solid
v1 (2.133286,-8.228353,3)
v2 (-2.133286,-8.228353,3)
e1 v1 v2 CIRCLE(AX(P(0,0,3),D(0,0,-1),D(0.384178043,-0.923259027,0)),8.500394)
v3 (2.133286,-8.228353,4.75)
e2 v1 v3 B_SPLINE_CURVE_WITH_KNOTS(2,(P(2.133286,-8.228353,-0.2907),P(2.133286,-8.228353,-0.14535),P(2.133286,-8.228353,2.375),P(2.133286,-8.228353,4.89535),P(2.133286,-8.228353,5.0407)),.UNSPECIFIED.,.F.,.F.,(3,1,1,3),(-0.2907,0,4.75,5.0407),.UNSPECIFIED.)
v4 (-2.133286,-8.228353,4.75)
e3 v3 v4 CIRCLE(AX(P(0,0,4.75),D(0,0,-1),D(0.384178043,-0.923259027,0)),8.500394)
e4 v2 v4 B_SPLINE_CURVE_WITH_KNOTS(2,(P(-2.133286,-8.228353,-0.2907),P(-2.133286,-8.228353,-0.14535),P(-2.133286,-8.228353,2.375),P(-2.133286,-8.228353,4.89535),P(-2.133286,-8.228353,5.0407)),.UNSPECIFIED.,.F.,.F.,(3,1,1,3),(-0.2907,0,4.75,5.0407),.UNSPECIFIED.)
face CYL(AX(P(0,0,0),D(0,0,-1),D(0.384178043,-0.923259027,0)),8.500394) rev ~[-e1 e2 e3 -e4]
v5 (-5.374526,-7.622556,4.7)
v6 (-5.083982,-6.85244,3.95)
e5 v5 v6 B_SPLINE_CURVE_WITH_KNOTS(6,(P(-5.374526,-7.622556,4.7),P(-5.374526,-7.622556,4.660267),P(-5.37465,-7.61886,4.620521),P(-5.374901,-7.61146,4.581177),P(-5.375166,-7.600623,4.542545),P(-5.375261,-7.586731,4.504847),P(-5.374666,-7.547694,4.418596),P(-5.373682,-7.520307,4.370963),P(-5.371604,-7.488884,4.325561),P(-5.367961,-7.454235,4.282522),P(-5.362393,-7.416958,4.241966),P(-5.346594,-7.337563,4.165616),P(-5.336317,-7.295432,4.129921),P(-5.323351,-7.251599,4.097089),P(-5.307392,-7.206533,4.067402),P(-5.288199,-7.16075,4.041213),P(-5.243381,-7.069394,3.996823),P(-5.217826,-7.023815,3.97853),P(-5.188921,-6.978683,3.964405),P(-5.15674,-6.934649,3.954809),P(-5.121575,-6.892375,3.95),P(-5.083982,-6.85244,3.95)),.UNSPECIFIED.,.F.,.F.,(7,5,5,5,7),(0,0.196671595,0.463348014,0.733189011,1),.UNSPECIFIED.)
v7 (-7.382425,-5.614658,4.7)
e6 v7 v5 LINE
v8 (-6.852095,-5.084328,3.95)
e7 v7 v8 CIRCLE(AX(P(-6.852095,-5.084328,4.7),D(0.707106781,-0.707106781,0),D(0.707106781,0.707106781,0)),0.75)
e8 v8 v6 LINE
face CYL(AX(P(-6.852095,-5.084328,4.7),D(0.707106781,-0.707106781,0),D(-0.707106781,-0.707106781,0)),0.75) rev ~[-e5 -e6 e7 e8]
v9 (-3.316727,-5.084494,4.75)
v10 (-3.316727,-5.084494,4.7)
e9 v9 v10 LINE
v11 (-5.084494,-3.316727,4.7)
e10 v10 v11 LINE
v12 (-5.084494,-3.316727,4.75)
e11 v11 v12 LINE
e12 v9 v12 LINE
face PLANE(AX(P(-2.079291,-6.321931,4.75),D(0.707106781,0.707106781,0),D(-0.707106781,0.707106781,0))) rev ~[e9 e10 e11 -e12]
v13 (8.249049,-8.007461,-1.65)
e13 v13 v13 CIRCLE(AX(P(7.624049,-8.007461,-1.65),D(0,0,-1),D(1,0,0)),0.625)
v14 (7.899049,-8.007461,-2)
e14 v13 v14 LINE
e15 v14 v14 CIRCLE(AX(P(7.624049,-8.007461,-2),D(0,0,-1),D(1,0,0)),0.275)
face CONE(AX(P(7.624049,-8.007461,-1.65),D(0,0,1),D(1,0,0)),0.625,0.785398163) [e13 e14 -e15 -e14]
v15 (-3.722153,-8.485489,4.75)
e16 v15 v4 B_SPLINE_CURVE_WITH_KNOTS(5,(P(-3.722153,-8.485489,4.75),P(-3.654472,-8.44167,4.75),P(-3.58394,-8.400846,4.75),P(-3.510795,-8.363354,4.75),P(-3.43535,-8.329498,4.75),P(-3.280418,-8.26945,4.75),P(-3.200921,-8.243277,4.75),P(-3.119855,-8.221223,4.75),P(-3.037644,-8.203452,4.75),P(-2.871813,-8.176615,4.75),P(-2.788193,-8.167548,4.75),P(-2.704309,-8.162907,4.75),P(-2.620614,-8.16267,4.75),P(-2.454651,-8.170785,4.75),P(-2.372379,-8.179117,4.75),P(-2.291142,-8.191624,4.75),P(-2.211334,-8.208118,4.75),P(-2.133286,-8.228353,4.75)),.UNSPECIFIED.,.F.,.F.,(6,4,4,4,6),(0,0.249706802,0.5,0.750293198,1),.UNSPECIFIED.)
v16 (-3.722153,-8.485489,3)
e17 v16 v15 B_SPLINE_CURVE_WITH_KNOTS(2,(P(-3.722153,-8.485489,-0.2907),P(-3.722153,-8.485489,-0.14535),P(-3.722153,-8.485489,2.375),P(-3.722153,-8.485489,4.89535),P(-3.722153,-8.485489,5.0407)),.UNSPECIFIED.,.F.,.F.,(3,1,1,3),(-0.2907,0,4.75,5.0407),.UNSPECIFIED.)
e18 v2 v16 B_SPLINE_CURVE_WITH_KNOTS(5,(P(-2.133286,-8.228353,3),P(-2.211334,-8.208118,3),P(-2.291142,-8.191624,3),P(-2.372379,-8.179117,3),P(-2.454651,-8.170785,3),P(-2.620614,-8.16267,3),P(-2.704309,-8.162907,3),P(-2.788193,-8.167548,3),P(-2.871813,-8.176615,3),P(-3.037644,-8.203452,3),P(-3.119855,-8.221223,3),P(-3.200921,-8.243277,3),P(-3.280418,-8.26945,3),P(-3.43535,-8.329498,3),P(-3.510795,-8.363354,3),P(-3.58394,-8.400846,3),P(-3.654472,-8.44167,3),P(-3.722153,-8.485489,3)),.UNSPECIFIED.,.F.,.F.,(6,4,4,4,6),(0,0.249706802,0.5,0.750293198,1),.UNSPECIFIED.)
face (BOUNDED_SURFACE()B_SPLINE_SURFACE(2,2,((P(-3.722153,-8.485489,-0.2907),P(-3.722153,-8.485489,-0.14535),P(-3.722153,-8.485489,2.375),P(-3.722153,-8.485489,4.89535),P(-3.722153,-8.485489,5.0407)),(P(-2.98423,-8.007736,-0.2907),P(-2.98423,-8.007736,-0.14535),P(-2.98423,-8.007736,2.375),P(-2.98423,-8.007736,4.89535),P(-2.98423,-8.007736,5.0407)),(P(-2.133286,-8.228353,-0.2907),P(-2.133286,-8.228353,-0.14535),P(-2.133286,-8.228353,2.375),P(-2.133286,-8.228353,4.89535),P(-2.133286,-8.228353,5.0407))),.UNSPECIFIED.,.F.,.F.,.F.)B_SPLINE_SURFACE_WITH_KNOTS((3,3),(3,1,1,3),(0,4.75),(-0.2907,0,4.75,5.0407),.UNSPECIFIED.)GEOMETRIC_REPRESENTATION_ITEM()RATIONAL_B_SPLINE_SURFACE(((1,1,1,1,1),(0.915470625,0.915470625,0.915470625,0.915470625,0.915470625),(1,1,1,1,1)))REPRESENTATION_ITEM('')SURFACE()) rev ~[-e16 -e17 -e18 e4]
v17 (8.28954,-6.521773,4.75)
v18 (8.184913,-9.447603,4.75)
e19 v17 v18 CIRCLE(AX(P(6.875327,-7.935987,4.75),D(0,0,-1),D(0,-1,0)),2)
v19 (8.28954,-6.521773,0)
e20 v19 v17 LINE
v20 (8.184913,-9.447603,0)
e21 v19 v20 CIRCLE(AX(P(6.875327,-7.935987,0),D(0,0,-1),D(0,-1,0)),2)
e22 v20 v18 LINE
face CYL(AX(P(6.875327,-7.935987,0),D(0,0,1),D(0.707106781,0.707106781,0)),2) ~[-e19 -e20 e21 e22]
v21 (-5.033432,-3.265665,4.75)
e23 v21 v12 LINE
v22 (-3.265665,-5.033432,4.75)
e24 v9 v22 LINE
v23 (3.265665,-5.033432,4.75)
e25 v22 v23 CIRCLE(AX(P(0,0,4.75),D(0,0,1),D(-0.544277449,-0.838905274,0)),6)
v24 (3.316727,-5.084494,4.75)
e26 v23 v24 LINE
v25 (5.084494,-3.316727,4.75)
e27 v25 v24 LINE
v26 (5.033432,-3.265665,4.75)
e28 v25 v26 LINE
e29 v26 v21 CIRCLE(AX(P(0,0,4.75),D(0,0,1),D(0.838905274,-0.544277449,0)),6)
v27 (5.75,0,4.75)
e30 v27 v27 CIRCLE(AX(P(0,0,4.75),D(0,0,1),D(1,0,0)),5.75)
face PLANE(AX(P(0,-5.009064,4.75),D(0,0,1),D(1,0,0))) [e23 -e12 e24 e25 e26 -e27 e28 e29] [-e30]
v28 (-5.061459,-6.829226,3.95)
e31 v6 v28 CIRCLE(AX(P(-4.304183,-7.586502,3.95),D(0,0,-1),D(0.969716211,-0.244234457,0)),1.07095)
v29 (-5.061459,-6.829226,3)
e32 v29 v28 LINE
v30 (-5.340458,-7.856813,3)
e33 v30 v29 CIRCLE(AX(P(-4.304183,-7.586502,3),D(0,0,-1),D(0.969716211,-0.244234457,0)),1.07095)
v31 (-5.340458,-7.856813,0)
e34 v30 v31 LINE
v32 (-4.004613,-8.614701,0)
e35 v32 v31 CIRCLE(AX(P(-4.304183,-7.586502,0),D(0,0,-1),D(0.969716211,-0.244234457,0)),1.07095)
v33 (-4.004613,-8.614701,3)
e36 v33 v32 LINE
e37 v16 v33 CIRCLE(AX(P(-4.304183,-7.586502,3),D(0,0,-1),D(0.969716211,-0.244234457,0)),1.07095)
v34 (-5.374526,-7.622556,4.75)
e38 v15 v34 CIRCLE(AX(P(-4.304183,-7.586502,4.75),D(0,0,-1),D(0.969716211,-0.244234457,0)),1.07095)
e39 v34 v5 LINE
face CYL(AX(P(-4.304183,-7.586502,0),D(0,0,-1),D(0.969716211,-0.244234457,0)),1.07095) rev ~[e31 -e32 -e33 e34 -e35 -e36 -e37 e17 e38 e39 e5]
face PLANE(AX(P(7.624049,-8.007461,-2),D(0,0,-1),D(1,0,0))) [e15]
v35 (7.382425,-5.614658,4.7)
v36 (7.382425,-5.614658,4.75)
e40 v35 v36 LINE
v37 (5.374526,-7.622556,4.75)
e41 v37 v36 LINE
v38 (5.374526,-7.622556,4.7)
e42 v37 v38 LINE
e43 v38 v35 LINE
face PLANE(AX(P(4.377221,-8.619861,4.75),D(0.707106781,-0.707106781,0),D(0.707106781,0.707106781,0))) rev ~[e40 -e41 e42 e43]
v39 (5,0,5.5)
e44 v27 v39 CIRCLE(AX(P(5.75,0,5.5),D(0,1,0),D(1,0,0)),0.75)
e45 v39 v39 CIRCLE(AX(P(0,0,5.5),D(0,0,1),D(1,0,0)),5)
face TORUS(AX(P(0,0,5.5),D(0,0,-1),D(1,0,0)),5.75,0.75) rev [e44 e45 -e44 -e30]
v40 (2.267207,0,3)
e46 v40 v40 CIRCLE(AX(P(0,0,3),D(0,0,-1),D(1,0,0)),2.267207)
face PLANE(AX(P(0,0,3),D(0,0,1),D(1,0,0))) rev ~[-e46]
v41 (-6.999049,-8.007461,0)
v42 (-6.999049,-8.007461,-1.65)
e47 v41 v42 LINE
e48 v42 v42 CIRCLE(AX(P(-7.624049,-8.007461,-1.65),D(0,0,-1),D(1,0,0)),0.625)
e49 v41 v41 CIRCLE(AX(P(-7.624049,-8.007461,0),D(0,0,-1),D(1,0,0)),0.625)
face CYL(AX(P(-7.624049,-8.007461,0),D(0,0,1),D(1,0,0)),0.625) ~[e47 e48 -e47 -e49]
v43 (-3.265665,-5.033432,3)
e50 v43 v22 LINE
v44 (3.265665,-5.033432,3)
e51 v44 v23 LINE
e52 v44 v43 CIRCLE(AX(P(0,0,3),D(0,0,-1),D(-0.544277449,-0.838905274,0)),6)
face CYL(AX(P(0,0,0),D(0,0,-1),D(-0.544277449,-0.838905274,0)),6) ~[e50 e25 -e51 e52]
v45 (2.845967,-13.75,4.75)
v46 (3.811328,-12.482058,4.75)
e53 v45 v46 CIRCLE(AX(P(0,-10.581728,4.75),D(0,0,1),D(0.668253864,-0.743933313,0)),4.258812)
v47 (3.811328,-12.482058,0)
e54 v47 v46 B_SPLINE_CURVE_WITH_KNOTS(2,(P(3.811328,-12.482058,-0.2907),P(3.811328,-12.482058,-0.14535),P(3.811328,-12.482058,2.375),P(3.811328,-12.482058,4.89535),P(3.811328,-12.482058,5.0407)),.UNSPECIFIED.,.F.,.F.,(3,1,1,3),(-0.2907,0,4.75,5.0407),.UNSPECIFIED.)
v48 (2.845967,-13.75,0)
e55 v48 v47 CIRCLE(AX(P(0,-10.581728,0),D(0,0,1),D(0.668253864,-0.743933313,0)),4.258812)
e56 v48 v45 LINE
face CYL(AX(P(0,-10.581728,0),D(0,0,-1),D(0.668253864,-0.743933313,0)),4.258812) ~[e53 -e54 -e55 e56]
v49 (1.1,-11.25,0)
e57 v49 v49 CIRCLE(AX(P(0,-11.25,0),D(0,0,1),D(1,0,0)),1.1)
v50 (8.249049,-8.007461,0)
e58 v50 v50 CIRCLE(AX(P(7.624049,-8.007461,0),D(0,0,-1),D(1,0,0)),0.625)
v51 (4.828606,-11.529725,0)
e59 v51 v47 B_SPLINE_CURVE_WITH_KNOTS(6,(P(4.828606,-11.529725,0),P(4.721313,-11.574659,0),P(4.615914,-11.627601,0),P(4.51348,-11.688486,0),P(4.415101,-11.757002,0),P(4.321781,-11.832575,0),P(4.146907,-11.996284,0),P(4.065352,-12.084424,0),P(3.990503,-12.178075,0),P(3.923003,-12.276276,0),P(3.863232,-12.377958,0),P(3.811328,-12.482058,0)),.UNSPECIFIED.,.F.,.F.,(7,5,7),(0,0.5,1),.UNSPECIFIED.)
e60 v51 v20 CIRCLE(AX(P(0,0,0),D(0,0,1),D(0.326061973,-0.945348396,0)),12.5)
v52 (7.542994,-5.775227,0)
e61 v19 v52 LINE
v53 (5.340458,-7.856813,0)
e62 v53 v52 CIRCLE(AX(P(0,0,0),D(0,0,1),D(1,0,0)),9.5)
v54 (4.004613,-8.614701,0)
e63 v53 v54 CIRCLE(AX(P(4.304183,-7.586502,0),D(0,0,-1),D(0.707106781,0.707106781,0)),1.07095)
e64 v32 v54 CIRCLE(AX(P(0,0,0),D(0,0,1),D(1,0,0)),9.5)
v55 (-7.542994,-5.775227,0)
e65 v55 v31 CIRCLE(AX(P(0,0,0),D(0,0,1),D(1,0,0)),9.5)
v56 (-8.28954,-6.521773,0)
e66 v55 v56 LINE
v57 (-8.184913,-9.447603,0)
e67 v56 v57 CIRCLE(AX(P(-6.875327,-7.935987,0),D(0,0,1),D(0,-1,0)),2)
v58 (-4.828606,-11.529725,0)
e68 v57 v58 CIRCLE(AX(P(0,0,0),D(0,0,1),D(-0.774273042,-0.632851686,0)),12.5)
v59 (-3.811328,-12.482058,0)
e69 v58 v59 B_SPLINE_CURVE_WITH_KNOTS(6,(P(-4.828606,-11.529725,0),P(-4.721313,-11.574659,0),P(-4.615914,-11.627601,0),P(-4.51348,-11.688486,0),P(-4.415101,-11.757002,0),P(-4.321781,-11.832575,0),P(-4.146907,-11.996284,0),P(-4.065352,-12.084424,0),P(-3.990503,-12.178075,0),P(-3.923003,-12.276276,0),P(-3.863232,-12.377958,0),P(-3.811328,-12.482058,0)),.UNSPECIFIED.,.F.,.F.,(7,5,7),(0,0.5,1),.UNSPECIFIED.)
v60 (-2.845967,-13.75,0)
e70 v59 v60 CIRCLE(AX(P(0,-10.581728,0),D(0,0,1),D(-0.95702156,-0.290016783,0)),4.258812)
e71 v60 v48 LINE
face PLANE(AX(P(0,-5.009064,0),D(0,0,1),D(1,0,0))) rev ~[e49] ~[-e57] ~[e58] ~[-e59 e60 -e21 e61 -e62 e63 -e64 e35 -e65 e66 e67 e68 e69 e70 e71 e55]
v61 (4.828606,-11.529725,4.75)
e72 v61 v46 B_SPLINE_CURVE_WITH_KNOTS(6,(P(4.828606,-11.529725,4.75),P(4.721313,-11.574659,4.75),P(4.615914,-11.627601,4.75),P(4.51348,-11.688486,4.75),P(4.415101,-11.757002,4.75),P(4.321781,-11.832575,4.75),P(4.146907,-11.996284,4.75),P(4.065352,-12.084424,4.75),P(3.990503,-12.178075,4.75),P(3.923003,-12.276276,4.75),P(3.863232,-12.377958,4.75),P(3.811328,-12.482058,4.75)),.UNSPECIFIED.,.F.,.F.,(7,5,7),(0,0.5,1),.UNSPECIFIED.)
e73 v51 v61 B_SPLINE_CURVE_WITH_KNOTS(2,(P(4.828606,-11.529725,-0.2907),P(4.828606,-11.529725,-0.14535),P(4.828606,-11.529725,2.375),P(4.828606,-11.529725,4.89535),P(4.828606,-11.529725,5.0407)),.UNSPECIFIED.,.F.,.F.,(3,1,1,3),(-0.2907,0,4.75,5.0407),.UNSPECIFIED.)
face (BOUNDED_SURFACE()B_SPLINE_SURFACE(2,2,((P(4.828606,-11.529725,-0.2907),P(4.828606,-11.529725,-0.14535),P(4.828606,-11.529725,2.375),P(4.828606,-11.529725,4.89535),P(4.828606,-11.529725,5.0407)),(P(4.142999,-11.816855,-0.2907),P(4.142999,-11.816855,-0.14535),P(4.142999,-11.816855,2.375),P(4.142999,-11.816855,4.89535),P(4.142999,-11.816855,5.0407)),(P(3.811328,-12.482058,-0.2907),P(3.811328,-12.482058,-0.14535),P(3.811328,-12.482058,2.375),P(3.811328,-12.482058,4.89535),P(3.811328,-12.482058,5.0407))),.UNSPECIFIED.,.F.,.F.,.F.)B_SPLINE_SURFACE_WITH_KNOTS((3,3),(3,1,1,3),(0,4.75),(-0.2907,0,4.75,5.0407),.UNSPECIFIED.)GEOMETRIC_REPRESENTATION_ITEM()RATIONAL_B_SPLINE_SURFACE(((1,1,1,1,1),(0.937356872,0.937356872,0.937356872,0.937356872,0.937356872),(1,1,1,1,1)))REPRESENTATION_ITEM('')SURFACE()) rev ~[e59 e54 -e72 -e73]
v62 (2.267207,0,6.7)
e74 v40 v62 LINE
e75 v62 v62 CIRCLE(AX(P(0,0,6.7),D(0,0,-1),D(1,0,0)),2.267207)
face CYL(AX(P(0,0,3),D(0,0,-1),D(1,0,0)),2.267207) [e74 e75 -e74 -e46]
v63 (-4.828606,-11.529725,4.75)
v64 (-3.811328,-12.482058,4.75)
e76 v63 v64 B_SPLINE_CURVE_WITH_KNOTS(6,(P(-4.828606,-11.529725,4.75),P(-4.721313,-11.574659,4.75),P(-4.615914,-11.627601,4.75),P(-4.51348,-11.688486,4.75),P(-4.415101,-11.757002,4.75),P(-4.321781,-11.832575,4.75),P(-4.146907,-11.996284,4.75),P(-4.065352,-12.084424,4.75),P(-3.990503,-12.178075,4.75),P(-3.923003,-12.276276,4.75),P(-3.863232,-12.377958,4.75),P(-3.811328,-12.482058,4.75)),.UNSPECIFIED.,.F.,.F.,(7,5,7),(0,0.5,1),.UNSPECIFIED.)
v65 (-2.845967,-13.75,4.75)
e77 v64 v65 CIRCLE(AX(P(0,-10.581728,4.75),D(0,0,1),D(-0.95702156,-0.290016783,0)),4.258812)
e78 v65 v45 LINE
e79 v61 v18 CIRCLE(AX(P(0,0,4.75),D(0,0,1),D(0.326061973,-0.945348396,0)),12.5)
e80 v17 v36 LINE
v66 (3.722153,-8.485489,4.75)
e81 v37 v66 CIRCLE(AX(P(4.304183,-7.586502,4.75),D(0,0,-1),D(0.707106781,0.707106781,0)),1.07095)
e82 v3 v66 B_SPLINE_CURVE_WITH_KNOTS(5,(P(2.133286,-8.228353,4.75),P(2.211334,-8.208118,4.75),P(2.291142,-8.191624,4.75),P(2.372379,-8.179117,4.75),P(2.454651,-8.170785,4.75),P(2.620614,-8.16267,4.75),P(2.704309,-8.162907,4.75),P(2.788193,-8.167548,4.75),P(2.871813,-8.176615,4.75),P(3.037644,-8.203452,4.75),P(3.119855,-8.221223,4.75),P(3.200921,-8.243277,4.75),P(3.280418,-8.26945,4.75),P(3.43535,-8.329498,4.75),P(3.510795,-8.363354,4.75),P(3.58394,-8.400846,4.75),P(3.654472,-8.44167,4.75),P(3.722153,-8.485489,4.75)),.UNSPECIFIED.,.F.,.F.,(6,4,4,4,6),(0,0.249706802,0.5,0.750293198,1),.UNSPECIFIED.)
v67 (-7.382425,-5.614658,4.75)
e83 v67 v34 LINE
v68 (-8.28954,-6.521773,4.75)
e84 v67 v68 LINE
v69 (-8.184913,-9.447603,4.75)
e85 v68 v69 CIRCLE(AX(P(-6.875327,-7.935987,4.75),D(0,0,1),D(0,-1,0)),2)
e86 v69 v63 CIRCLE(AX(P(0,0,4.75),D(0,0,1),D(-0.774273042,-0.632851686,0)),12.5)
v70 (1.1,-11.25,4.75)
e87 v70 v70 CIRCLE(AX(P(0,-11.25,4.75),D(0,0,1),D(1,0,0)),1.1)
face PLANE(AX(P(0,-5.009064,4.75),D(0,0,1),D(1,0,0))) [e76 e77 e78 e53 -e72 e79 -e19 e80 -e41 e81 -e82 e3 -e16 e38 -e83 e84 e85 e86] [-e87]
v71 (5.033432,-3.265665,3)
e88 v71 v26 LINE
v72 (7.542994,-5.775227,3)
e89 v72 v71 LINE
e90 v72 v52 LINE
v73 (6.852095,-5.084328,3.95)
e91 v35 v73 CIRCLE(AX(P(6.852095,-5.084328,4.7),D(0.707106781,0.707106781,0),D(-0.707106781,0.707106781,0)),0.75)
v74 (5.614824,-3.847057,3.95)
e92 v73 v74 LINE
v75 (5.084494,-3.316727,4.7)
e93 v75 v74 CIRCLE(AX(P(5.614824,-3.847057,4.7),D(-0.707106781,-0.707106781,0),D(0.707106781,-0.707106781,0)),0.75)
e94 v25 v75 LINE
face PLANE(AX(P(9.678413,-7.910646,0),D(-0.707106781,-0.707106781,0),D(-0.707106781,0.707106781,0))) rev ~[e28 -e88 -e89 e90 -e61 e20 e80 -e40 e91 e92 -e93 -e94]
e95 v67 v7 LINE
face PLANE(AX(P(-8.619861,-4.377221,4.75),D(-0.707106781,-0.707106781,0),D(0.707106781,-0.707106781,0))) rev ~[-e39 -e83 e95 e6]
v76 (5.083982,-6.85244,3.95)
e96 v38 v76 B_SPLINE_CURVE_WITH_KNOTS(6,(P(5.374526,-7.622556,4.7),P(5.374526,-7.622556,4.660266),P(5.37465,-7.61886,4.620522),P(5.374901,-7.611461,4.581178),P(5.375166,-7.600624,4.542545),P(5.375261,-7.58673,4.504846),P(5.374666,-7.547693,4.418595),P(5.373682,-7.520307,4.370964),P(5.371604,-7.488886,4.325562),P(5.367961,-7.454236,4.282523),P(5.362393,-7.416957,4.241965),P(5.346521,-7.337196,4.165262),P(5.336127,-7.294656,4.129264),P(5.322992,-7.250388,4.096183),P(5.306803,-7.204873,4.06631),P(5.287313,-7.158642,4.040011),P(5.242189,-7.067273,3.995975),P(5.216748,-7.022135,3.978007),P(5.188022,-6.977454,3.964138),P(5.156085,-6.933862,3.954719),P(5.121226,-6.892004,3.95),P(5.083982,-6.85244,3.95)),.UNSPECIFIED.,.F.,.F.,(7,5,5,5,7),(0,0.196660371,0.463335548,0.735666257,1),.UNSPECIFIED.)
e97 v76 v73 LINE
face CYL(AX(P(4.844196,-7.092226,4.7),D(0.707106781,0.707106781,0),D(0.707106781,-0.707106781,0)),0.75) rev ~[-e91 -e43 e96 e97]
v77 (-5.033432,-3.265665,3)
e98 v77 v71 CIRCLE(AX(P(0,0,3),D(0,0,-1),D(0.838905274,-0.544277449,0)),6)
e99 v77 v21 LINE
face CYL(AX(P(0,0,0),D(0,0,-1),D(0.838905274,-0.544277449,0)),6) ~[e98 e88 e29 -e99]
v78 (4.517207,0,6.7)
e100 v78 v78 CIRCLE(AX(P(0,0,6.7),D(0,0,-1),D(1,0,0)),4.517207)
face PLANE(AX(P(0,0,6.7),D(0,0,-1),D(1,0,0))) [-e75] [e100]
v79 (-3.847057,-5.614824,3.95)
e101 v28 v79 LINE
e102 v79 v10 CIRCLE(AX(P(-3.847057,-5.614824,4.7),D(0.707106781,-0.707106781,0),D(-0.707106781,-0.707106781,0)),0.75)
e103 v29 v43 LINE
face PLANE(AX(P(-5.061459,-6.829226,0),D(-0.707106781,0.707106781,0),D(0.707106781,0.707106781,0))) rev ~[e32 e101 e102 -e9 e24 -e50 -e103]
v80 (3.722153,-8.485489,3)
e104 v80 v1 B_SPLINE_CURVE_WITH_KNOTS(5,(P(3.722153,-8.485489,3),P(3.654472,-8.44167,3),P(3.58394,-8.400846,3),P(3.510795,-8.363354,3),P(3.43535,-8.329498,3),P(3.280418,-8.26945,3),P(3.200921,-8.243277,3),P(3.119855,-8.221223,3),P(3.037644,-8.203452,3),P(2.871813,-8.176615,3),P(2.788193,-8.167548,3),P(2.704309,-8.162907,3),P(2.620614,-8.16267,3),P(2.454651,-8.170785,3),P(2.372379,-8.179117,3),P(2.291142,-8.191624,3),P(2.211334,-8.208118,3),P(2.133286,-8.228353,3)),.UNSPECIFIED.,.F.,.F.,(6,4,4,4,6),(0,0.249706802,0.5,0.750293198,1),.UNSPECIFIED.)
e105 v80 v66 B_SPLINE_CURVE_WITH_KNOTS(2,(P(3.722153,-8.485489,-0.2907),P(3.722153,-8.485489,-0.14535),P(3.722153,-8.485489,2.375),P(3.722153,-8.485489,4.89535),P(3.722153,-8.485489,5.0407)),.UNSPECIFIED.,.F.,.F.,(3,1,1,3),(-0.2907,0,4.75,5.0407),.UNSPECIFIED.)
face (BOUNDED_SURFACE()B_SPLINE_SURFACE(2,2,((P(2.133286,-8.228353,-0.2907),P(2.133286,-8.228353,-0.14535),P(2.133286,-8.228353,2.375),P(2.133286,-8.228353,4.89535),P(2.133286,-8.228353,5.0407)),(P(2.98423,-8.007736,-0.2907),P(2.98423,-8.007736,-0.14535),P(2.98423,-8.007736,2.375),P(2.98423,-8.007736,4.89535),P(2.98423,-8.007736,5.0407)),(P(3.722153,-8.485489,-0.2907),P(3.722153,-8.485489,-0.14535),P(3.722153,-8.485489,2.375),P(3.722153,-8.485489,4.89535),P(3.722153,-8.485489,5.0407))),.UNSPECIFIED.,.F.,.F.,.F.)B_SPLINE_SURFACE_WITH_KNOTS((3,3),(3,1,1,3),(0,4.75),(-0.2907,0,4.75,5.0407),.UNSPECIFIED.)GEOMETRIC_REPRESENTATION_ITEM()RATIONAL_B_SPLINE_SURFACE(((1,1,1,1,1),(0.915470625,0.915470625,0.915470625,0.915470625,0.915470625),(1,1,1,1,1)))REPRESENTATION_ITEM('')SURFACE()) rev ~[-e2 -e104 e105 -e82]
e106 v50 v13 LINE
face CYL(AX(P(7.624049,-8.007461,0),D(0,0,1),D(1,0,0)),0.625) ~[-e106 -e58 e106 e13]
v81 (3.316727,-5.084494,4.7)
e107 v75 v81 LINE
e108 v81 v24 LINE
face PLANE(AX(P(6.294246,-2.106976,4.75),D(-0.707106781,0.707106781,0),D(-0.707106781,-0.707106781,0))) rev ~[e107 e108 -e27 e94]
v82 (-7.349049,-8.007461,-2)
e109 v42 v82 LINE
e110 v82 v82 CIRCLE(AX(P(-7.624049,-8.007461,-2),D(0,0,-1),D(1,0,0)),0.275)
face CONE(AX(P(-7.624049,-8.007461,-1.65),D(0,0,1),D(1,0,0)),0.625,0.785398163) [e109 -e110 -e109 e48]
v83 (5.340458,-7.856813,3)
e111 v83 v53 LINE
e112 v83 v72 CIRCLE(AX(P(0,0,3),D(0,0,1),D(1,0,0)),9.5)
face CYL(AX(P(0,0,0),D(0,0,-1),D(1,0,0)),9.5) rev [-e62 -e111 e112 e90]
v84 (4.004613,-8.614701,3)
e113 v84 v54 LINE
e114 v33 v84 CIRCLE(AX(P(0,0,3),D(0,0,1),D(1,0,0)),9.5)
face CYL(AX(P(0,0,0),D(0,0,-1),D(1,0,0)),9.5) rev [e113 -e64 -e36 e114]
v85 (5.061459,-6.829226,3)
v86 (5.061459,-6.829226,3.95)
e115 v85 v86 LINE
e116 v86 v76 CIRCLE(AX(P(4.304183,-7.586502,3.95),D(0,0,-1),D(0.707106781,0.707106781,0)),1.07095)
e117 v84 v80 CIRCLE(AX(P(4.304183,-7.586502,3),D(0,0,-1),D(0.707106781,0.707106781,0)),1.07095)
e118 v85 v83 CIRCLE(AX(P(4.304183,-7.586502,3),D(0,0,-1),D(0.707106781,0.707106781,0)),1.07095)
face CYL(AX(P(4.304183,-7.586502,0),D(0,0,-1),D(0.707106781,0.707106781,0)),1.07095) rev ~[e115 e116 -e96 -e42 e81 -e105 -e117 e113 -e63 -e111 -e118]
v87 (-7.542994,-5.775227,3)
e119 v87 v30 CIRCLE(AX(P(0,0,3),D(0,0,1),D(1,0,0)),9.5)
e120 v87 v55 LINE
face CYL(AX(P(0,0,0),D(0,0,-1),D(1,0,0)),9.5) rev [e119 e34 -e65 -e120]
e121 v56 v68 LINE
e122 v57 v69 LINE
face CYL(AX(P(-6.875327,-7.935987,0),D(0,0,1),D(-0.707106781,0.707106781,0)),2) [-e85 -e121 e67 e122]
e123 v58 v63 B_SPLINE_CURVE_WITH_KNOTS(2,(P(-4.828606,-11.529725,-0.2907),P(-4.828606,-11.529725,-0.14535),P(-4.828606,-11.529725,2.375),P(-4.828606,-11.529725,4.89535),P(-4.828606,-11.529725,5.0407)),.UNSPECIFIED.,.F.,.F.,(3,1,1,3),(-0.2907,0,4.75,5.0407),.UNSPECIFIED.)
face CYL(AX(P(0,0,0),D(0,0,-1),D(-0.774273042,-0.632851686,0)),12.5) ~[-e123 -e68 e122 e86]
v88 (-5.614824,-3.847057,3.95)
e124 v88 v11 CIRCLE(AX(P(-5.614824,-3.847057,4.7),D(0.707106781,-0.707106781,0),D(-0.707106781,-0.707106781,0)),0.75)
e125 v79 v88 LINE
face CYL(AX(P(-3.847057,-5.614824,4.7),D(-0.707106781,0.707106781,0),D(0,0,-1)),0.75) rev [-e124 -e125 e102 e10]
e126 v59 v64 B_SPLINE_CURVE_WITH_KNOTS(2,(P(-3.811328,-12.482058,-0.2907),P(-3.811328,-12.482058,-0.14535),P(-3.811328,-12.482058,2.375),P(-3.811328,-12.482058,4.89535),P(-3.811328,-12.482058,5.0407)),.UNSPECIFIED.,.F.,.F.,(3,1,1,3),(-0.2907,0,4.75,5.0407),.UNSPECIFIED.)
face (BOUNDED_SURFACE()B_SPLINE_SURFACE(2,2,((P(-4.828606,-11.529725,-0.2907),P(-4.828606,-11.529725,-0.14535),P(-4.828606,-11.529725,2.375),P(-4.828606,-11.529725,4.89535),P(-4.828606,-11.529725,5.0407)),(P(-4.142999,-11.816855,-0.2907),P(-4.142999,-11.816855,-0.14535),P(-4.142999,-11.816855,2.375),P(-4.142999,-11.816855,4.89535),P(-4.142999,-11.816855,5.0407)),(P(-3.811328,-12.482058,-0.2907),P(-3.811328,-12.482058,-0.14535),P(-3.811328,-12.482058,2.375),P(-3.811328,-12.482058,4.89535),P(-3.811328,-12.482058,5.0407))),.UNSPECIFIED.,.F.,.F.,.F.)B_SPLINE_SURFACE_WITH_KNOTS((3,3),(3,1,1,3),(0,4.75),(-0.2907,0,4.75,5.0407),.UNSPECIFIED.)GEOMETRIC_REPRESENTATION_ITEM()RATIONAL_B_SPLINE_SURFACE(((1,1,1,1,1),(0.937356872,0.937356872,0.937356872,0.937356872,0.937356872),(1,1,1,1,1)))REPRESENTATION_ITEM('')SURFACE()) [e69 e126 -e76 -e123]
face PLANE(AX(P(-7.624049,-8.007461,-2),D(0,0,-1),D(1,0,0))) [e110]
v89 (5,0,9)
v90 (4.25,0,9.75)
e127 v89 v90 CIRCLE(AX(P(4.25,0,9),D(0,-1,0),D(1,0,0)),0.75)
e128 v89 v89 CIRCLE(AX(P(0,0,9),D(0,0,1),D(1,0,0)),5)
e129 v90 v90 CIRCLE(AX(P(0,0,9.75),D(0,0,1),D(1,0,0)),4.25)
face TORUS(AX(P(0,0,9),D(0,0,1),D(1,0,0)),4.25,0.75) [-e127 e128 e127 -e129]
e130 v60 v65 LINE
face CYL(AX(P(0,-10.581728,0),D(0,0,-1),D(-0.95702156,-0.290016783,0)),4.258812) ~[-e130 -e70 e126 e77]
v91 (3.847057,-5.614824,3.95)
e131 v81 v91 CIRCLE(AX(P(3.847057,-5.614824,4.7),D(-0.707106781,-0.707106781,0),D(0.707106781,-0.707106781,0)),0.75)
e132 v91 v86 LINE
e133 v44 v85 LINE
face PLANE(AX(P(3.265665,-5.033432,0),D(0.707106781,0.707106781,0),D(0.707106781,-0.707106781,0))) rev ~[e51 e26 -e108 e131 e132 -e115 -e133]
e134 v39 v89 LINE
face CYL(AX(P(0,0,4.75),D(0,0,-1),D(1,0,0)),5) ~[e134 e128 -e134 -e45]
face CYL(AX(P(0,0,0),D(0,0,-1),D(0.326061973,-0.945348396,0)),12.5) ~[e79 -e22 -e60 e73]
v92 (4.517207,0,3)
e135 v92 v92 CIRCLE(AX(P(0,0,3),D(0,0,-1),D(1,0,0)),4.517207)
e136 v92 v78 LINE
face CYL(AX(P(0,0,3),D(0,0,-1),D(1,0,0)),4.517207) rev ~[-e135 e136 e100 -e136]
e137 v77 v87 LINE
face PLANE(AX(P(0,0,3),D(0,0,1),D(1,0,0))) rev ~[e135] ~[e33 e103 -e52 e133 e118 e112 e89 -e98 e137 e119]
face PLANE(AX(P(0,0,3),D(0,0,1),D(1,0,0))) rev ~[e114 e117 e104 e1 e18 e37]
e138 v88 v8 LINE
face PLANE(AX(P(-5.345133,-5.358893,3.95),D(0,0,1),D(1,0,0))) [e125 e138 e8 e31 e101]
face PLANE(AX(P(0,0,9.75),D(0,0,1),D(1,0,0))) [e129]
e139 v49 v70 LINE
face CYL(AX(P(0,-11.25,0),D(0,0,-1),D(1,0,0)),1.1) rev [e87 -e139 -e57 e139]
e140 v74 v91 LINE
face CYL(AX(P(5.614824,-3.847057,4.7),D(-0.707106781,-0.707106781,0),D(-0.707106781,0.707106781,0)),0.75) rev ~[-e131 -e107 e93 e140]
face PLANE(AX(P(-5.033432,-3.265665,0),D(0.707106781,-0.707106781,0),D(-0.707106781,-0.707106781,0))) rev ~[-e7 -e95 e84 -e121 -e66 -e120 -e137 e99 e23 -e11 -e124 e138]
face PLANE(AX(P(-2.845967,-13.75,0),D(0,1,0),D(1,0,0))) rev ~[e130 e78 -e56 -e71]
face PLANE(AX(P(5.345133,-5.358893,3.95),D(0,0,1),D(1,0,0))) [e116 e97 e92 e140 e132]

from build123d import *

# Parameters (mm, degrees)
F0_R      = 1.1
F1_DEPTH  = 4.75
F2_R      = 5
F3_DEPTH  = 5
F5_R      = 2
F7_DEPTH  = 0.8
F8_R      = 0.75
F9_R      = 9.5
F10_DEPTH = 3
F12_R     = 4.5172071506
F12_R_2   = 2.2672071506
F13_DEPTH = 3.7
F14_R     = 0.625
F15_DEPTH = 2
F16_SIZE  = 0.35


# Not quite as in the source:
# - a feature names something its author has since deleted; it is built from what else it names


with BuildPart() as f1:
    # F0 (on Top) → F1 (new body)
    with BuildSketch(Plane.XY):
        with BuildLine():
            Line((-5.0334316447, -3.2656646917), (-9.6784130262, -7.9106460732))
            ThreePointArc((-9.6784130262, -7.9106460732), (-7.1490584463, -10.2538267653), (-4.0757746589, -11.8168549509))
            ThreePointArc((-4.0757746589, -11.8168549509), (-3.593311946, -12.8676823003), (-2.8459674038, -13.75))
            Line((-2.8459674038, -13.75), (2.8459674038, -13.75))
            ThreePointArc((2.8459674038, -13.75), (3.593311946, -12.8676823003), (4.0757746589, -11.8168549509))
            ThreePointArc((4.0757746589, -11.8168549509), (7.1490584463, -10.2538267653), (9.6784130262, -7.9106460732))
            Line((9.6784130262, -7.9106460732), (5.0334316447, -3.2656646917))
            ThreePointArc((5.0334316447, -3.2656646917), (0, 6), (-5.0334316447, -3.2656646917))
        make_face()
        with Locations((0, -11.25)):
            Circle(F0_R, mode=Mode.SUBTRACT)
        with BuildLine():
            Line((-5.061459087, -6.82922604), (-3.2656646917, -5.0334316447))
            ThreePointArc((-3.2656646917, -5.0334316447), (0, -6), (3.2656646917, -5.0334316447))
            Line((3.2656646917, -5.0334316447), (5.061459087, -6.82922604))
            ThreePointArc((5.061459087, -6.82922604), (4.8326547168, -8.5179809488), (3.2656646917, -7.8480653995))
            ThreePointArc((3.2656646917, -7.8480653995), (0, -8.5003938964), (-3.2656646917, -7.8480653995))
            ThreePointArc((-3.2656646917, -7.8480653995), (-4.8326547168, -8.5179809488), (-5.061459087, -6.82922604))
        make_face(mode=Mode.SUBTRACT)
    extrude(amount=F1_DEPTH)

    # F2 (on face) → F3 (join)
    with BuildSketch(Plane.XY.offset(4.75)):
        Circle(F2_R)
    extrude(amount=F3_DEPTH)

    # F5
    f5_edges = [f1.edges().sort_by_distance(p)[0] for p in [
        (3.265665, -7.848065, 2.375),
        (-3.265665, -7.848065, 2.375),
        (-9.678413, -7.910646, 2.375),
        (-4.075775, -11.816855, 2.375),
        (9.678413, -7.910646, 2.375),
        (4.075775, -11.816855, 2.375),
    ]]
    fillet(f5_edges, radius=F5_R)

    # F6 (on face) → F7 (cut)
    with BuildSketch(Plane.XY.offset(4.75)):
        Polygon((4.3772207939, -8.619861481), (8.619861481, -4.3772207939), (6.2942457002, -2.1069760406), (2.0792905268, -6.3219312139), align=None)
        Polygon((-4.3772207939, -8.619861481), (-2.0792905268, -6.3219312139), (-6.2942457002, -2.1069760406), (-8.619861481, -4.3772207939), align=None)
    extrude(amount=-F7_DEPTH, mode=Mode.SUBTRACT)

    # F8
    f8_edges = [f1.edges().sort_by_distance(p)[0] for p in [
        (4.200611, -4.200611, 3.95),
        (-4.200611, -4.200611, 3.95),
        (-5, 0, 4.75),
        (-5, 0, 9.75),
        (6.378475, -6.618607, 3.95),
        (-6.378475, -6.618607, 3.95),
    ]]
    fillet(f8_edges, radius=F8_R)

    # F9 (on Top) → F10 (cut)
    with BuildSketch(Plane.XY):
        Circle(F9_R)
    extrude(amount=F10_DEPTH, mode=Mode.SUBTRACT)

    # F12 (on face) → F13 (cut)
    with BuildSketch(Plane(origin=(0, 0, 3), x_dir=(1, 0, 0), z_dir=(0, 0, -1))):
        Circle(F12_R)
        Circle(F12_R_2, mode=Mode.SUBTRACT)
    extrude(amount=-F13_DEPTH, mode=Mode.SUBTRACT)

    # F14 (on face) → F15 (join)
    with BuildSketch(Plane(origin=(0, 0, 0), x_dir=(1, 0, 0), z_dir=(0, 0, -1))):
        with Locations((7.6240489866, 8.007460935)):
            Circle(F14_R)
        with Locations((-7.6240489866, 8.007460935)):
            Circle(F14_R)
    extrude(amount=F15_DEPTH)

    # F16
    f16_edges = [f1.edges().sort_by_distance(p)[0] for p in [
        (6.999049, -8.007461, -2),
        (-8.249049, -8.007461, -2),
    ]]
    chamfer(f16_edges, length=F16_SIZE)


solid = f1.part
